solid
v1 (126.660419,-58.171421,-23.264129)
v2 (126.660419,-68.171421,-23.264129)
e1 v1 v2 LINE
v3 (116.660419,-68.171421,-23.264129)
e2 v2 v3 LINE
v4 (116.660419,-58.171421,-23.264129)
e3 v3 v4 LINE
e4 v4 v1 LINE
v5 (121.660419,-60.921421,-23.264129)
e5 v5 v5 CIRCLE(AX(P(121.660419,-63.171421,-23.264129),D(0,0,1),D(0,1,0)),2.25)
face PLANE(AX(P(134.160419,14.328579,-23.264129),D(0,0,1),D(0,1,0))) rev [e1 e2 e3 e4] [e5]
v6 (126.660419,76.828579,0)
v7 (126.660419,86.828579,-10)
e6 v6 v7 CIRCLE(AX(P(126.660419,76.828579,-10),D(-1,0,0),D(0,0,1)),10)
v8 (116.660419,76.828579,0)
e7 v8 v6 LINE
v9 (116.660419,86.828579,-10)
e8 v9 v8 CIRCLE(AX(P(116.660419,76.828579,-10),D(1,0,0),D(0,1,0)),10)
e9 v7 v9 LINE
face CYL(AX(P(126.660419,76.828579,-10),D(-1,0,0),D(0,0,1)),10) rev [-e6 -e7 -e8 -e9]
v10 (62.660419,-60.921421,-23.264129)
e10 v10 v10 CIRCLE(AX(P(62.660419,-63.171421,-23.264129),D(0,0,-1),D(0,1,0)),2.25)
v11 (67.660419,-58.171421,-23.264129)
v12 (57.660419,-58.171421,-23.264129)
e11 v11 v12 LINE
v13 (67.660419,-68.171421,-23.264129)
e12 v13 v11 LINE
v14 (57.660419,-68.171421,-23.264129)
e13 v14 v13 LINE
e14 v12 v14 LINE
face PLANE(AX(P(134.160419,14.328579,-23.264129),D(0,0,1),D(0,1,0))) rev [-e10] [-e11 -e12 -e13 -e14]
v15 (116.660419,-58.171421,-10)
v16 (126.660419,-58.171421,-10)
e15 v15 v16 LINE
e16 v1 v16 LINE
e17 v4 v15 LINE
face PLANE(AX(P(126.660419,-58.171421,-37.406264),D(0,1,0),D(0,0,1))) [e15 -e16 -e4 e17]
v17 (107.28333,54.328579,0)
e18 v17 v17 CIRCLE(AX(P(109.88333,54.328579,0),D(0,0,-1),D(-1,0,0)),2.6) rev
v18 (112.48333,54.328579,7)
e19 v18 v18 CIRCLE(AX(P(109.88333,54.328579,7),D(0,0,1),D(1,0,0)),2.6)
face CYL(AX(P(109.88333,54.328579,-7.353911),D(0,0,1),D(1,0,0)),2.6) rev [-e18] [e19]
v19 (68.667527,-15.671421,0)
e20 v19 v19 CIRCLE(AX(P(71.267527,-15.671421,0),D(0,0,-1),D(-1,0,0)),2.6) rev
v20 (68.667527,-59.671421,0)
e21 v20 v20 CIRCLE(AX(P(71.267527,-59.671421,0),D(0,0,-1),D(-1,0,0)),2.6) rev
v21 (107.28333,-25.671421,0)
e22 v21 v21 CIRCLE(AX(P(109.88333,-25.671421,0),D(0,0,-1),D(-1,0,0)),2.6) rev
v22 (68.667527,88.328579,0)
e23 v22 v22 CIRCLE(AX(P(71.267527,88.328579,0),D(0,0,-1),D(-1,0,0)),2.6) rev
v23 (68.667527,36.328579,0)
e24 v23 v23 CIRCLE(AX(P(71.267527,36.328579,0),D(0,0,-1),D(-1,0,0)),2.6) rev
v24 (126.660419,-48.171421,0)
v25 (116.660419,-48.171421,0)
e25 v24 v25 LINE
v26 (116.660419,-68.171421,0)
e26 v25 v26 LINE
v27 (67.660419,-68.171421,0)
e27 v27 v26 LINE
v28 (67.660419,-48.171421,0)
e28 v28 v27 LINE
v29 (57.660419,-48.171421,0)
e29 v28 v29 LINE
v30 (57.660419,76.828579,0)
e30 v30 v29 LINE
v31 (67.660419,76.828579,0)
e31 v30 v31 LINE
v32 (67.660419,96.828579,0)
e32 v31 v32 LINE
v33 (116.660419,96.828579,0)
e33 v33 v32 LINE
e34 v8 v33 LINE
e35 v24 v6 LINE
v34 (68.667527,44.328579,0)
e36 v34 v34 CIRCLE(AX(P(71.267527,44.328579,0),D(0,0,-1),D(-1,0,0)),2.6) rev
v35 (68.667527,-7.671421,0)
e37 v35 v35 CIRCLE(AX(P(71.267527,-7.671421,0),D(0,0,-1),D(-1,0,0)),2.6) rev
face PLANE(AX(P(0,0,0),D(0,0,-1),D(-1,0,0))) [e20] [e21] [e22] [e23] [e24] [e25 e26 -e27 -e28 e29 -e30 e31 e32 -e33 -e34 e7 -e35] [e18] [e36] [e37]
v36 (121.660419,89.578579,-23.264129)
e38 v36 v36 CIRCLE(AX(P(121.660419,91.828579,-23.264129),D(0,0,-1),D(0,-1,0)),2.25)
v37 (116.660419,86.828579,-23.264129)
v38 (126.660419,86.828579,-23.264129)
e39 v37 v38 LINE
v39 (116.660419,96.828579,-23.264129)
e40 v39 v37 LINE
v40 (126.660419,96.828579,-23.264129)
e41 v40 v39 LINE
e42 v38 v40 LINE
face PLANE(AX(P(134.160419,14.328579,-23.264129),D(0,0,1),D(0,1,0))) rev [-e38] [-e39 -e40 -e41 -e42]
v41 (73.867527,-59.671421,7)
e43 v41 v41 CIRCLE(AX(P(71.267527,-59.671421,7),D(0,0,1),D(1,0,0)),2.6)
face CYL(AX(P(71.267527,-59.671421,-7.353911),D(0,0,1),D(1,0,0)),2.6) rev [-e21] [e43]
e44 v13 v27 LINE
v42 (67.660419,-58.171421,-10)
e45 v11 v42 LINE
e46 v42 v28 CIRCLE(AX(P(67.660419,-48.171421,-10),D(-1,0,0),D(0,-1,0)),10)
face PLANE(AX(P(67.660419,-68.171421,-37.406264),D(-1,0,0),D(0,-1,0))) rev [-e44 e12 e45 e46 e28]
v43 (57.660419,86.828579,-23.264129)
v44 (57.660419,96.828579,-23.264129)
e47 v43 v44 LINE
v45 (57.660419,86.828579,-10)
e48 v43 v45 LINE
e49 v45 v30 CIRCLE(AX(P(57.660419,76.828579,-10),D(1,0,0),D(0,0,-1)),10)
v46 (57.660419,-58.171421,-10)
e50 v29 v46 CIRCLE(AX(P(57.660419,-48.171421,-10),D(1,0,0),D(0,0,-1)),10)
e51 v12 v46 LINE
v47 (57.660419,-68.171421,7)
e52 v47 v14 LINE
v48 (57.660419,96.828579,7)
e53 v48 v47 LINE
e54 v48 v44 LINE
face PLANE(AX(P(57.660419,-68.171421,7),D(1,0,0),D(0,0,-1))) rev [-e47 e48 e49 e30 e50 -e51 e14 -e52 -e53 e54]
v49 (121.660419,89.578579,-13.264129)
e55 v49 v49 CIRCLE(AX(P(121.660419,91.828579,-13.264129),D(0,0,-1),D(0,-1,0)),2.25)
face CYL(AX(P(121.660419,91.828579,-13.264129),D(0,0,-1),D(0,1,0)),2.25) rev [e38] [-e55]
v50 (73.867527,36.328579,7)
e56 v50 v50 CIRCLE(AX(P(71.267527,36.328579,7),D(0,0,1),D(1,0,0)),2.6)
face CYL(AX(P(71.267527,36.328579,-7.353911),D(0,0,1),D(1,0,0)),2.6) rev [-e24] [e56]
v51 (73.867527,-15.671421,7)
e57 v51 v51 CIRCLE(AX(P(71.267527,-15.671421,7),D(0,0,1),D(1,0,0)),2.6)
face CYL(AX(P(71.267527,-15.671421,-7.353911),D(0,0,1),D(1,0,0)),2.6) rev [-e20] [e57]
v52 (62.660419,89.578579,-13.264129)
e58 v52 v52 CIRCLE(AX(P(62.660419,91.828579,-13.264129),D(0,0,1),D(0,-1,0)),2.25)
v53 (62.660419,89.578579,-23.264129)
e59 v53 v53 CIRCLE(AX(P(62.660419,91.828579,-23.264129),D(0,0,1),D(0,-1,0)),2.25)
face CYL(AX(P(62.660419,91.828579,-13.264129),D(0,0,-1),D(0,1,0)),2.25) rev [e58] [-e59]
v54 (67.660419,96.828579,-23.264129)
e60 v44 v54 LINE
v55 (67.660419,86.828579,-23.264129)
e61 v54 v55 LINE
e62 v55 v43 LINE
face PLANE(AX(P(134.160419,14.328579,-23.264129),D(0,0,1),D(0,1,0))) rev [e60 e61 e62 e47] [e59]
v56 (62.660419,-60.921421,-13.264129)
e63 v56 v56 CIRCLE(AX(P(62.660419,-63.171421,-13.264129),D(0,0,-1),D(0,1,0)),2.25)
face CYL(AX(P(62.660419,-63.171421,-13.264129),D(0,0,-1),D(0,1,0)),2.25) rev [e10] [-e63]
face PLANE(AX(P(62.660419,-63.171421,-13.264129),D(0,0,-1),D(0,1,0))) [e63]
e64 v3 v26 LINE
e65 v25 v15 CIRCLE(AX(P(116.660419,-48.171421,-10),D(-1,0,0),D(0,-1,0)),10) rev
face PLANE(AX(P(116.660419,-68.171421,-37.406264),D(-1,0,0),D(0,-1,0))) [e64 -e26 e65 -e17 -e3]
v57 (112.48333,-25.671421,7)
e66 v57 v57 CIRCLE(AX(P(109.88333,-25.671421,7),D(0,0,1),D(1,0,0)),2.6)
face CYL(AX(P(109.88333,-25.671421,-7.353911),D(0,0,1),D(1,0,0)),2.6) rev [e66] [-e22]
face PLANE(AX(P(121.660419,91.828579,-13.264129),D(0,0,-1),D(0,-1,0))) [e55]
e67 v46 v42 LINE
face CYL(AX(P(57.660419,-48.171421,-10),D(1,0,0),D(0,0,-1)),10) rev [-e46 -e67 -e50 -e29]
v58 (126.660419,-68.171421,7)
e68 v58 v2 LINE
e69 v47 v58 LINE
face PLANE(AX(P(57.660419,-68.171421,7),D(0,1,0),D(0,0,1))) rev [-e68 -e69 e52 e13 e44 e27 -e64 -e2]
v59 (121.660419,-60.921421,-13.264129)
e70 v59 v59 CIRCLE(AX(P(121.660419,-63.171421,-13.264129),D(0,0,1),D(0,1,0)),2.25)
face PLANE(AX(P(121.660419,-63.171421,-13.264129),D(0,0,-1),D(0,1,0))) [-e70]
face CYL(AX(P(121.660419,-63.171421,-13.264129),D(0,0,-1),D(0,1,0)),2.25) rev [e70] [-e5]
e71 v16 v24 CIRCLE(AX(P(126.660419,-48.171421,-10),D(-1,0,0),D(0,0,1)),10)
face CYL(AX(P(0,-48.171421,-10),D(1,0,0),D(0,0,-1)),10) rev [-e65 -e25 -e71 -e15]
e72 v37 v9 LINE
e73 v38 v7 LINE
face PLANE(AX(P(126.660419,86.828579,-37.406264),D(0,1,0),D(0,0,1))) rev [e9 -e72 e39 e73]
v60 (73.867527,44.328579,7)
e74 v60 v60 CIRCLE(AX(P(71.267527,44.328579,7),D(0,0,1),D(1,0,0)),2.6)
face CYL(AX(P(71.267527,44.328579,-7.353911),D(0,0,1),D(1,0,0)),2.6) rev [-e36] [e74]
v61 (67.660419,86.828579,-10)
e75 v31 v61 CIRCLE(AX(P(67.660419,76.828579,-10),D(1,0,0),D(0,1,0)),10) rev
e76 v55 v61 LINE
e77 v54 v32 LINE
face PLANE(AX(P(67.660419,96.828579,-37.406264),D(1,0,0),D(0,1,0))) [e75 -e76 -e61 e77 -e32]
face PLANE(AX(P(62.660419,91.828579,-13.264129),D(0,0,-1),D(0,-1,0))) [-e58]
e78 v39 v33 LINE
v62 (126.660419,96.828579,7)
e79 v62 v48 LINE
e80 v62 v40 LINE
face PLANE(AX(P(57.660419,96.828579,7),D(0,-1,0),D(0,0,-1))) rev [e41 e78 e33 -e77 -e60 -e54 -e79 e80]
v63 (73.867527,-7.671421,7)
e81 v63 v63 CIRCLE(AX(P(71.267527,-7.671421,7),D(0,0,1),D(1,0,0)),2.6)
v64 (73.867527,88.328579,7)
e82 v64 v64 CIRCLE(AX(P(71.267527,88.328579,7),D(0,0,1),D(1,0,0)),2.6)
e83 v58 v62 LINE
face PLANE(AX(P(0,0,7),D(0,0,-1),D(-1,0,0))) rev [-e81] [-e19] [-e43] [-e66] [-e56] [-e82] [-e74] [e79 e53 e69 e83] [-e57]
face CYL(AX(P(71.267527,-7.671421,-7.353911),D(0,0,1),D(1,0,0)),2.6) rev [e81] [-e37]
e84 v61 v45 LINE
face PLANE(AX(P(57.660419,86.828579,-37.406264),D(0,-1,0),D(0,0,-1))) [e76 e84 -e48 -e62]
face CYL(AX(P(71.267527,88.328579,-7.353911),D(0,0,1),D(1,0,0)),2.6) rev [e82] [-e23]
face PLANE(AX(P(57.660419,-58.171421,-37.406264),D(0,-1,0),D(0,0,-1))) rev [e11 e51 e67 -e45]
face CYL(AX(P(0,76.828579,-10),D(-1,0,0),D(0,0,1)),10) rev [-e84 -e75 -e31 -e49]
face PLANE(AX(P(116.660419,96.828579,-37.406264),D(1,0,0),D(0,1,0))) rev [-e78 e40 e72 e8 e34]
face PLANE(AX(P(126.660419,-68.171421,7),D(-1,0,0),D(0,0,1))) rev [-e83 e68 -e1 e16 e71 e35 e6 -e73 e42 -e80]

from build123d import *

# Parameters (mm, degrees)
SKETCH1_W            = 69
SKETCH1_H            = 165
BOSS_EXTRUDE1_DEPTH  = 7
SKETCH3_R            = 2.6
CUT_EXTRUDE2_DEPTH   = 7
SKETCH2_R            = 2.6
CUT_EXTRUDE1_DEPTH   = 7
SKETCH5_W            = 10
SKETCH5_H            = 10
BOSS_EXTRUDE2_DEPTH  = 23.264128691
SKETCH6_R            = 2.25
CUT_EXTRUDE3_DEPTH   = 10
FILLET1_R            = 10
FILLET1_OF_MIRROR1_R = 10
MIRROR2_START        = 123.910418582
MIRROR2_DEPTH        = 2.75
MIRROR2_START_2      = 116.660418582
MIRROR2_2_DEPTH      = 2.7499999
MIRROR2_START_3      = 119.410418482
MIRROR2_3_DEPTH      = 4.5000001
MIRROR2_START_4      = -23.264128691
MIRROR2_4_OUTLINE_R  = 2.25
MIRROR2_4_DEPTH      = 10


with BuildPart() as part:
    # Sketch1 → Boss-Extrude1 (new body)
    with BuildSketch(Plane.XY):
        with Locations((92.160418582, 14.328579343)):
            Rectangle(SKETCH1_W, SKETCH1_H)
    extrude(amount=BOSS_EXTRUDE1_DEPTH)

    # Sketch3 → Cut-Extrude2 (cut)
    with BuildSketch(Plane.XY.offset(7)):
        with Locations((109.883329943, 54.328579343)):
            Circle(SKETCH3_R)
        with Locations((109.883329943, -25.671420657)):
            Circle(SKETCH3_R)
    extrude(amount=-CUT_EXTRUDE2_DEPTH, mode=Mode.SUBTRACT)

    # Sketch2 → Cut-Extrude1 (cut)
    with BuildSketch(Plane.XY.offset(7)):
        with Locations((71.267526747, -59.671420657)):
            Circle(SKETCH2_R)
        with Locations((71.267526747, -15.671420657)):
            Circle(SKETCH2_R)
        with Locations((71.267526747, -7.671420657)):
            Circle(SKETCH2_R)
        with Locations((71.267526747, 36.328579343)):
            Circle(SKETCH2_R)
        with Locations((71.267526747, 44.328579343)):
            Circle(SKETCH2_R)
        with Locations((71.267526747, 88.328579343)):
            Circle(SKETCH2_R)
    extrude(amount=-CUT_EXTRUDE1_DEPTH, mode=Mode.SUBTRACT)

    # Sketch5 → Boss-Extrude2 (add)
    with BuildSketch(Plane(origin=(0, 0, 0), x_dir=(-1, 0, 0), z_dir=(0, 0, -1))):
        with Locations((-62.660418582, -63.171420657)):
            Rectangle(SKETCH5_W, SKETCH5_H)
    boss_extrude2 = extrude(amount=BOSS_EXTRUDE2_DEPTH)

    # Sketch6 → Cut-Extrude3 (cut)
    with BuildSketch(Plane(origin=(0, 0, -23.264128691), x_dir=(-1, 0, 0), z_dir=(0, 0, -1))):
        with Locations(Location((-62.660418582, -63.171420657, 0), (0, 0, 90))):
            Circle(SKETCH6_R)
    cut_extrude3 = extrude(amount=-CUT_EXTRUDE3_DEPTH, mode=Mode.SUBTRACT)

    # Fillet1
    fillet1_edges = [part.edges().sort_by_distance(p)[0] for p in [
        (62.660418582, -58.171420657, 0),
    ]]
    fillet(fillet1_edges, radius=FILLET1_R)

    # Mirror1: Boss-Extrude2, Cut-Extrude3 across plane
    add(boss_extrude2.mirror(Plane(origin=(0, 14.328579343, 0), x_dir=(0, 0, 1), z_dir=(0, -1, 0))))
    add(cut_extrude3.mirror(Plane(origin=(0, 14.328579343, 0), x_dir=(0, 0, 1), z_dir=(0, -1, 0))), mode=Mode.SUBTRACT)

    # Fillet1 of Mirror1
    fillet1_of_mirror1_edges = [part.edges().sort_by_distance(p)[0] for p in [
        (62.660418582, 86.828579343, 0),
    ]]
    fillet(fillet1_of_mirror1_edges, radius=FILLET1_OF_MIRROR1_R)

    # Mirror2: read off the stored shape, not the designer's step
    # Mirror2 outline → Mirror2 (add)
    with BuildSketch(Plane.YZ.offset(MIRROR2_START)):
        with BuildLine():
            ThreePointArc((-58.171420657, -10), (-55.242488469, -2.928932188), (-48.171420657, 0))
            Line((-48.171420657, 0), (-68.171420657, 0))
            Line((-68.171420657, 0), (-68.171420657, -23.264128691))
            Line((-68.171420657, -23.264128691), (-58.171420657, -23.264128691))
            Line((-58.171420657, -23.264128691), (-58.171420657, -10))
        make_face()
        with BuildLine():
            Line((96.828579343, -23.264128691), (96.828579343, 0))
            Line((96.828579343, 0), (76.828579343, 0))
            ThreePointArc((76.828579343, 0), (83.899647155, -2.928932188), (86.828579343, -10))
            Line((86.828579343, -10), (86.828579343, -23.264128691))
            Line((86.828579343, -23.264128691), (96.828579343, -23.264128691))
        make_face()
    extrude(amount=MIRROR2_DEPTH)

    # Mirror2 2 outline → Mirror2 2 (add)
    with BuildSketch(Plane.YZ.offset(MIRROR2_START_2)):
        with BuildLine():
            ThreePointArc((-58.171420657, -10), (-55.242488469, -2.928932188), (-48.171420657, 0))
            Line((-48.171420657, 0), (-68.171420657, 0))
            Line((-68.171420657, 0), (-68.171420657, -23.264128691))
            Line((-68.171420657, -23.264128691), (-58.171420657, -23.264128691))
            Line((-58.171420657, -23.264128691), (-58.171420657, -10))
        make_face()
        with BuildLine():
            Line((96.828579343, -23.264128691), (96.828579343, 0))
            Line((96.828579343, 0), (76.828579343, 0))
            ThreePointArc((76.828579343, 0), (83.899647155, -2.928932188), (86.828579343, -10))
            Line((86.828579343, -10), (86.828579343, -23.264128691))
            Line((86.828579343, -23.264128691), (96.828579343, -23.264128691))
        make_face()
    extrude(amount=MIRROR2_2_DEPTH)

    # Mirror2 3 outline → Mirror2 3 (add)
    with BuildSketch(Plane.YZ.offset(MIRROR2_START_3)):
        with BuildLine():
            Line((-68.171420657, -23.264128691), (-58.171420657, -23.264128691))
            Line((-58.171420657, -23.264128691), (-58.171420657, -10))
            ThreePointArc((-58.171420657, -10), (-55.242488469, -2.928932188), (-48.171420657, 0))
            Line((-48.171420657, 0), (-68.171420657, 0))
            Line((-68.171420657, 0), (-68.171420657, -23.264128691))
        make_face()
        with BuildLine():
            Line((96.828579343, 0), (76.828579343, 0))
            ThreePointArc((76.828579343, 0), (83.899647155, -2.928932188), (86.828579343, -10))
            Line((86.828579343, -10), (86.828579343, -23.264128691))
            Line((86.828579343, -23.264128691), (96.828579343, -23.264128691))
            Line((96.828579343, -23.264128691), (96.828579343, 0))
        make_face()
    extrude(amount=MIRROR2_3_DEPTH)

    # Mirror2 4 outline → Mirror2 4 (cut)
    with BuildSketch(Plane.XY.offset(MIRROR2_START_4)):
        with Locations((121.660418582, -63.171420657)):
            Circle(MIRROR2_4_OUTLINE_R)
        with Locations((121.660418582, 91.828579343)):
            Circle(MIRROR2_4_OUTLINE_R)
    extrude(amount=MIRROR2_4_DEPTH, mode=Mode.SUBTRACT)


solid = part.part
